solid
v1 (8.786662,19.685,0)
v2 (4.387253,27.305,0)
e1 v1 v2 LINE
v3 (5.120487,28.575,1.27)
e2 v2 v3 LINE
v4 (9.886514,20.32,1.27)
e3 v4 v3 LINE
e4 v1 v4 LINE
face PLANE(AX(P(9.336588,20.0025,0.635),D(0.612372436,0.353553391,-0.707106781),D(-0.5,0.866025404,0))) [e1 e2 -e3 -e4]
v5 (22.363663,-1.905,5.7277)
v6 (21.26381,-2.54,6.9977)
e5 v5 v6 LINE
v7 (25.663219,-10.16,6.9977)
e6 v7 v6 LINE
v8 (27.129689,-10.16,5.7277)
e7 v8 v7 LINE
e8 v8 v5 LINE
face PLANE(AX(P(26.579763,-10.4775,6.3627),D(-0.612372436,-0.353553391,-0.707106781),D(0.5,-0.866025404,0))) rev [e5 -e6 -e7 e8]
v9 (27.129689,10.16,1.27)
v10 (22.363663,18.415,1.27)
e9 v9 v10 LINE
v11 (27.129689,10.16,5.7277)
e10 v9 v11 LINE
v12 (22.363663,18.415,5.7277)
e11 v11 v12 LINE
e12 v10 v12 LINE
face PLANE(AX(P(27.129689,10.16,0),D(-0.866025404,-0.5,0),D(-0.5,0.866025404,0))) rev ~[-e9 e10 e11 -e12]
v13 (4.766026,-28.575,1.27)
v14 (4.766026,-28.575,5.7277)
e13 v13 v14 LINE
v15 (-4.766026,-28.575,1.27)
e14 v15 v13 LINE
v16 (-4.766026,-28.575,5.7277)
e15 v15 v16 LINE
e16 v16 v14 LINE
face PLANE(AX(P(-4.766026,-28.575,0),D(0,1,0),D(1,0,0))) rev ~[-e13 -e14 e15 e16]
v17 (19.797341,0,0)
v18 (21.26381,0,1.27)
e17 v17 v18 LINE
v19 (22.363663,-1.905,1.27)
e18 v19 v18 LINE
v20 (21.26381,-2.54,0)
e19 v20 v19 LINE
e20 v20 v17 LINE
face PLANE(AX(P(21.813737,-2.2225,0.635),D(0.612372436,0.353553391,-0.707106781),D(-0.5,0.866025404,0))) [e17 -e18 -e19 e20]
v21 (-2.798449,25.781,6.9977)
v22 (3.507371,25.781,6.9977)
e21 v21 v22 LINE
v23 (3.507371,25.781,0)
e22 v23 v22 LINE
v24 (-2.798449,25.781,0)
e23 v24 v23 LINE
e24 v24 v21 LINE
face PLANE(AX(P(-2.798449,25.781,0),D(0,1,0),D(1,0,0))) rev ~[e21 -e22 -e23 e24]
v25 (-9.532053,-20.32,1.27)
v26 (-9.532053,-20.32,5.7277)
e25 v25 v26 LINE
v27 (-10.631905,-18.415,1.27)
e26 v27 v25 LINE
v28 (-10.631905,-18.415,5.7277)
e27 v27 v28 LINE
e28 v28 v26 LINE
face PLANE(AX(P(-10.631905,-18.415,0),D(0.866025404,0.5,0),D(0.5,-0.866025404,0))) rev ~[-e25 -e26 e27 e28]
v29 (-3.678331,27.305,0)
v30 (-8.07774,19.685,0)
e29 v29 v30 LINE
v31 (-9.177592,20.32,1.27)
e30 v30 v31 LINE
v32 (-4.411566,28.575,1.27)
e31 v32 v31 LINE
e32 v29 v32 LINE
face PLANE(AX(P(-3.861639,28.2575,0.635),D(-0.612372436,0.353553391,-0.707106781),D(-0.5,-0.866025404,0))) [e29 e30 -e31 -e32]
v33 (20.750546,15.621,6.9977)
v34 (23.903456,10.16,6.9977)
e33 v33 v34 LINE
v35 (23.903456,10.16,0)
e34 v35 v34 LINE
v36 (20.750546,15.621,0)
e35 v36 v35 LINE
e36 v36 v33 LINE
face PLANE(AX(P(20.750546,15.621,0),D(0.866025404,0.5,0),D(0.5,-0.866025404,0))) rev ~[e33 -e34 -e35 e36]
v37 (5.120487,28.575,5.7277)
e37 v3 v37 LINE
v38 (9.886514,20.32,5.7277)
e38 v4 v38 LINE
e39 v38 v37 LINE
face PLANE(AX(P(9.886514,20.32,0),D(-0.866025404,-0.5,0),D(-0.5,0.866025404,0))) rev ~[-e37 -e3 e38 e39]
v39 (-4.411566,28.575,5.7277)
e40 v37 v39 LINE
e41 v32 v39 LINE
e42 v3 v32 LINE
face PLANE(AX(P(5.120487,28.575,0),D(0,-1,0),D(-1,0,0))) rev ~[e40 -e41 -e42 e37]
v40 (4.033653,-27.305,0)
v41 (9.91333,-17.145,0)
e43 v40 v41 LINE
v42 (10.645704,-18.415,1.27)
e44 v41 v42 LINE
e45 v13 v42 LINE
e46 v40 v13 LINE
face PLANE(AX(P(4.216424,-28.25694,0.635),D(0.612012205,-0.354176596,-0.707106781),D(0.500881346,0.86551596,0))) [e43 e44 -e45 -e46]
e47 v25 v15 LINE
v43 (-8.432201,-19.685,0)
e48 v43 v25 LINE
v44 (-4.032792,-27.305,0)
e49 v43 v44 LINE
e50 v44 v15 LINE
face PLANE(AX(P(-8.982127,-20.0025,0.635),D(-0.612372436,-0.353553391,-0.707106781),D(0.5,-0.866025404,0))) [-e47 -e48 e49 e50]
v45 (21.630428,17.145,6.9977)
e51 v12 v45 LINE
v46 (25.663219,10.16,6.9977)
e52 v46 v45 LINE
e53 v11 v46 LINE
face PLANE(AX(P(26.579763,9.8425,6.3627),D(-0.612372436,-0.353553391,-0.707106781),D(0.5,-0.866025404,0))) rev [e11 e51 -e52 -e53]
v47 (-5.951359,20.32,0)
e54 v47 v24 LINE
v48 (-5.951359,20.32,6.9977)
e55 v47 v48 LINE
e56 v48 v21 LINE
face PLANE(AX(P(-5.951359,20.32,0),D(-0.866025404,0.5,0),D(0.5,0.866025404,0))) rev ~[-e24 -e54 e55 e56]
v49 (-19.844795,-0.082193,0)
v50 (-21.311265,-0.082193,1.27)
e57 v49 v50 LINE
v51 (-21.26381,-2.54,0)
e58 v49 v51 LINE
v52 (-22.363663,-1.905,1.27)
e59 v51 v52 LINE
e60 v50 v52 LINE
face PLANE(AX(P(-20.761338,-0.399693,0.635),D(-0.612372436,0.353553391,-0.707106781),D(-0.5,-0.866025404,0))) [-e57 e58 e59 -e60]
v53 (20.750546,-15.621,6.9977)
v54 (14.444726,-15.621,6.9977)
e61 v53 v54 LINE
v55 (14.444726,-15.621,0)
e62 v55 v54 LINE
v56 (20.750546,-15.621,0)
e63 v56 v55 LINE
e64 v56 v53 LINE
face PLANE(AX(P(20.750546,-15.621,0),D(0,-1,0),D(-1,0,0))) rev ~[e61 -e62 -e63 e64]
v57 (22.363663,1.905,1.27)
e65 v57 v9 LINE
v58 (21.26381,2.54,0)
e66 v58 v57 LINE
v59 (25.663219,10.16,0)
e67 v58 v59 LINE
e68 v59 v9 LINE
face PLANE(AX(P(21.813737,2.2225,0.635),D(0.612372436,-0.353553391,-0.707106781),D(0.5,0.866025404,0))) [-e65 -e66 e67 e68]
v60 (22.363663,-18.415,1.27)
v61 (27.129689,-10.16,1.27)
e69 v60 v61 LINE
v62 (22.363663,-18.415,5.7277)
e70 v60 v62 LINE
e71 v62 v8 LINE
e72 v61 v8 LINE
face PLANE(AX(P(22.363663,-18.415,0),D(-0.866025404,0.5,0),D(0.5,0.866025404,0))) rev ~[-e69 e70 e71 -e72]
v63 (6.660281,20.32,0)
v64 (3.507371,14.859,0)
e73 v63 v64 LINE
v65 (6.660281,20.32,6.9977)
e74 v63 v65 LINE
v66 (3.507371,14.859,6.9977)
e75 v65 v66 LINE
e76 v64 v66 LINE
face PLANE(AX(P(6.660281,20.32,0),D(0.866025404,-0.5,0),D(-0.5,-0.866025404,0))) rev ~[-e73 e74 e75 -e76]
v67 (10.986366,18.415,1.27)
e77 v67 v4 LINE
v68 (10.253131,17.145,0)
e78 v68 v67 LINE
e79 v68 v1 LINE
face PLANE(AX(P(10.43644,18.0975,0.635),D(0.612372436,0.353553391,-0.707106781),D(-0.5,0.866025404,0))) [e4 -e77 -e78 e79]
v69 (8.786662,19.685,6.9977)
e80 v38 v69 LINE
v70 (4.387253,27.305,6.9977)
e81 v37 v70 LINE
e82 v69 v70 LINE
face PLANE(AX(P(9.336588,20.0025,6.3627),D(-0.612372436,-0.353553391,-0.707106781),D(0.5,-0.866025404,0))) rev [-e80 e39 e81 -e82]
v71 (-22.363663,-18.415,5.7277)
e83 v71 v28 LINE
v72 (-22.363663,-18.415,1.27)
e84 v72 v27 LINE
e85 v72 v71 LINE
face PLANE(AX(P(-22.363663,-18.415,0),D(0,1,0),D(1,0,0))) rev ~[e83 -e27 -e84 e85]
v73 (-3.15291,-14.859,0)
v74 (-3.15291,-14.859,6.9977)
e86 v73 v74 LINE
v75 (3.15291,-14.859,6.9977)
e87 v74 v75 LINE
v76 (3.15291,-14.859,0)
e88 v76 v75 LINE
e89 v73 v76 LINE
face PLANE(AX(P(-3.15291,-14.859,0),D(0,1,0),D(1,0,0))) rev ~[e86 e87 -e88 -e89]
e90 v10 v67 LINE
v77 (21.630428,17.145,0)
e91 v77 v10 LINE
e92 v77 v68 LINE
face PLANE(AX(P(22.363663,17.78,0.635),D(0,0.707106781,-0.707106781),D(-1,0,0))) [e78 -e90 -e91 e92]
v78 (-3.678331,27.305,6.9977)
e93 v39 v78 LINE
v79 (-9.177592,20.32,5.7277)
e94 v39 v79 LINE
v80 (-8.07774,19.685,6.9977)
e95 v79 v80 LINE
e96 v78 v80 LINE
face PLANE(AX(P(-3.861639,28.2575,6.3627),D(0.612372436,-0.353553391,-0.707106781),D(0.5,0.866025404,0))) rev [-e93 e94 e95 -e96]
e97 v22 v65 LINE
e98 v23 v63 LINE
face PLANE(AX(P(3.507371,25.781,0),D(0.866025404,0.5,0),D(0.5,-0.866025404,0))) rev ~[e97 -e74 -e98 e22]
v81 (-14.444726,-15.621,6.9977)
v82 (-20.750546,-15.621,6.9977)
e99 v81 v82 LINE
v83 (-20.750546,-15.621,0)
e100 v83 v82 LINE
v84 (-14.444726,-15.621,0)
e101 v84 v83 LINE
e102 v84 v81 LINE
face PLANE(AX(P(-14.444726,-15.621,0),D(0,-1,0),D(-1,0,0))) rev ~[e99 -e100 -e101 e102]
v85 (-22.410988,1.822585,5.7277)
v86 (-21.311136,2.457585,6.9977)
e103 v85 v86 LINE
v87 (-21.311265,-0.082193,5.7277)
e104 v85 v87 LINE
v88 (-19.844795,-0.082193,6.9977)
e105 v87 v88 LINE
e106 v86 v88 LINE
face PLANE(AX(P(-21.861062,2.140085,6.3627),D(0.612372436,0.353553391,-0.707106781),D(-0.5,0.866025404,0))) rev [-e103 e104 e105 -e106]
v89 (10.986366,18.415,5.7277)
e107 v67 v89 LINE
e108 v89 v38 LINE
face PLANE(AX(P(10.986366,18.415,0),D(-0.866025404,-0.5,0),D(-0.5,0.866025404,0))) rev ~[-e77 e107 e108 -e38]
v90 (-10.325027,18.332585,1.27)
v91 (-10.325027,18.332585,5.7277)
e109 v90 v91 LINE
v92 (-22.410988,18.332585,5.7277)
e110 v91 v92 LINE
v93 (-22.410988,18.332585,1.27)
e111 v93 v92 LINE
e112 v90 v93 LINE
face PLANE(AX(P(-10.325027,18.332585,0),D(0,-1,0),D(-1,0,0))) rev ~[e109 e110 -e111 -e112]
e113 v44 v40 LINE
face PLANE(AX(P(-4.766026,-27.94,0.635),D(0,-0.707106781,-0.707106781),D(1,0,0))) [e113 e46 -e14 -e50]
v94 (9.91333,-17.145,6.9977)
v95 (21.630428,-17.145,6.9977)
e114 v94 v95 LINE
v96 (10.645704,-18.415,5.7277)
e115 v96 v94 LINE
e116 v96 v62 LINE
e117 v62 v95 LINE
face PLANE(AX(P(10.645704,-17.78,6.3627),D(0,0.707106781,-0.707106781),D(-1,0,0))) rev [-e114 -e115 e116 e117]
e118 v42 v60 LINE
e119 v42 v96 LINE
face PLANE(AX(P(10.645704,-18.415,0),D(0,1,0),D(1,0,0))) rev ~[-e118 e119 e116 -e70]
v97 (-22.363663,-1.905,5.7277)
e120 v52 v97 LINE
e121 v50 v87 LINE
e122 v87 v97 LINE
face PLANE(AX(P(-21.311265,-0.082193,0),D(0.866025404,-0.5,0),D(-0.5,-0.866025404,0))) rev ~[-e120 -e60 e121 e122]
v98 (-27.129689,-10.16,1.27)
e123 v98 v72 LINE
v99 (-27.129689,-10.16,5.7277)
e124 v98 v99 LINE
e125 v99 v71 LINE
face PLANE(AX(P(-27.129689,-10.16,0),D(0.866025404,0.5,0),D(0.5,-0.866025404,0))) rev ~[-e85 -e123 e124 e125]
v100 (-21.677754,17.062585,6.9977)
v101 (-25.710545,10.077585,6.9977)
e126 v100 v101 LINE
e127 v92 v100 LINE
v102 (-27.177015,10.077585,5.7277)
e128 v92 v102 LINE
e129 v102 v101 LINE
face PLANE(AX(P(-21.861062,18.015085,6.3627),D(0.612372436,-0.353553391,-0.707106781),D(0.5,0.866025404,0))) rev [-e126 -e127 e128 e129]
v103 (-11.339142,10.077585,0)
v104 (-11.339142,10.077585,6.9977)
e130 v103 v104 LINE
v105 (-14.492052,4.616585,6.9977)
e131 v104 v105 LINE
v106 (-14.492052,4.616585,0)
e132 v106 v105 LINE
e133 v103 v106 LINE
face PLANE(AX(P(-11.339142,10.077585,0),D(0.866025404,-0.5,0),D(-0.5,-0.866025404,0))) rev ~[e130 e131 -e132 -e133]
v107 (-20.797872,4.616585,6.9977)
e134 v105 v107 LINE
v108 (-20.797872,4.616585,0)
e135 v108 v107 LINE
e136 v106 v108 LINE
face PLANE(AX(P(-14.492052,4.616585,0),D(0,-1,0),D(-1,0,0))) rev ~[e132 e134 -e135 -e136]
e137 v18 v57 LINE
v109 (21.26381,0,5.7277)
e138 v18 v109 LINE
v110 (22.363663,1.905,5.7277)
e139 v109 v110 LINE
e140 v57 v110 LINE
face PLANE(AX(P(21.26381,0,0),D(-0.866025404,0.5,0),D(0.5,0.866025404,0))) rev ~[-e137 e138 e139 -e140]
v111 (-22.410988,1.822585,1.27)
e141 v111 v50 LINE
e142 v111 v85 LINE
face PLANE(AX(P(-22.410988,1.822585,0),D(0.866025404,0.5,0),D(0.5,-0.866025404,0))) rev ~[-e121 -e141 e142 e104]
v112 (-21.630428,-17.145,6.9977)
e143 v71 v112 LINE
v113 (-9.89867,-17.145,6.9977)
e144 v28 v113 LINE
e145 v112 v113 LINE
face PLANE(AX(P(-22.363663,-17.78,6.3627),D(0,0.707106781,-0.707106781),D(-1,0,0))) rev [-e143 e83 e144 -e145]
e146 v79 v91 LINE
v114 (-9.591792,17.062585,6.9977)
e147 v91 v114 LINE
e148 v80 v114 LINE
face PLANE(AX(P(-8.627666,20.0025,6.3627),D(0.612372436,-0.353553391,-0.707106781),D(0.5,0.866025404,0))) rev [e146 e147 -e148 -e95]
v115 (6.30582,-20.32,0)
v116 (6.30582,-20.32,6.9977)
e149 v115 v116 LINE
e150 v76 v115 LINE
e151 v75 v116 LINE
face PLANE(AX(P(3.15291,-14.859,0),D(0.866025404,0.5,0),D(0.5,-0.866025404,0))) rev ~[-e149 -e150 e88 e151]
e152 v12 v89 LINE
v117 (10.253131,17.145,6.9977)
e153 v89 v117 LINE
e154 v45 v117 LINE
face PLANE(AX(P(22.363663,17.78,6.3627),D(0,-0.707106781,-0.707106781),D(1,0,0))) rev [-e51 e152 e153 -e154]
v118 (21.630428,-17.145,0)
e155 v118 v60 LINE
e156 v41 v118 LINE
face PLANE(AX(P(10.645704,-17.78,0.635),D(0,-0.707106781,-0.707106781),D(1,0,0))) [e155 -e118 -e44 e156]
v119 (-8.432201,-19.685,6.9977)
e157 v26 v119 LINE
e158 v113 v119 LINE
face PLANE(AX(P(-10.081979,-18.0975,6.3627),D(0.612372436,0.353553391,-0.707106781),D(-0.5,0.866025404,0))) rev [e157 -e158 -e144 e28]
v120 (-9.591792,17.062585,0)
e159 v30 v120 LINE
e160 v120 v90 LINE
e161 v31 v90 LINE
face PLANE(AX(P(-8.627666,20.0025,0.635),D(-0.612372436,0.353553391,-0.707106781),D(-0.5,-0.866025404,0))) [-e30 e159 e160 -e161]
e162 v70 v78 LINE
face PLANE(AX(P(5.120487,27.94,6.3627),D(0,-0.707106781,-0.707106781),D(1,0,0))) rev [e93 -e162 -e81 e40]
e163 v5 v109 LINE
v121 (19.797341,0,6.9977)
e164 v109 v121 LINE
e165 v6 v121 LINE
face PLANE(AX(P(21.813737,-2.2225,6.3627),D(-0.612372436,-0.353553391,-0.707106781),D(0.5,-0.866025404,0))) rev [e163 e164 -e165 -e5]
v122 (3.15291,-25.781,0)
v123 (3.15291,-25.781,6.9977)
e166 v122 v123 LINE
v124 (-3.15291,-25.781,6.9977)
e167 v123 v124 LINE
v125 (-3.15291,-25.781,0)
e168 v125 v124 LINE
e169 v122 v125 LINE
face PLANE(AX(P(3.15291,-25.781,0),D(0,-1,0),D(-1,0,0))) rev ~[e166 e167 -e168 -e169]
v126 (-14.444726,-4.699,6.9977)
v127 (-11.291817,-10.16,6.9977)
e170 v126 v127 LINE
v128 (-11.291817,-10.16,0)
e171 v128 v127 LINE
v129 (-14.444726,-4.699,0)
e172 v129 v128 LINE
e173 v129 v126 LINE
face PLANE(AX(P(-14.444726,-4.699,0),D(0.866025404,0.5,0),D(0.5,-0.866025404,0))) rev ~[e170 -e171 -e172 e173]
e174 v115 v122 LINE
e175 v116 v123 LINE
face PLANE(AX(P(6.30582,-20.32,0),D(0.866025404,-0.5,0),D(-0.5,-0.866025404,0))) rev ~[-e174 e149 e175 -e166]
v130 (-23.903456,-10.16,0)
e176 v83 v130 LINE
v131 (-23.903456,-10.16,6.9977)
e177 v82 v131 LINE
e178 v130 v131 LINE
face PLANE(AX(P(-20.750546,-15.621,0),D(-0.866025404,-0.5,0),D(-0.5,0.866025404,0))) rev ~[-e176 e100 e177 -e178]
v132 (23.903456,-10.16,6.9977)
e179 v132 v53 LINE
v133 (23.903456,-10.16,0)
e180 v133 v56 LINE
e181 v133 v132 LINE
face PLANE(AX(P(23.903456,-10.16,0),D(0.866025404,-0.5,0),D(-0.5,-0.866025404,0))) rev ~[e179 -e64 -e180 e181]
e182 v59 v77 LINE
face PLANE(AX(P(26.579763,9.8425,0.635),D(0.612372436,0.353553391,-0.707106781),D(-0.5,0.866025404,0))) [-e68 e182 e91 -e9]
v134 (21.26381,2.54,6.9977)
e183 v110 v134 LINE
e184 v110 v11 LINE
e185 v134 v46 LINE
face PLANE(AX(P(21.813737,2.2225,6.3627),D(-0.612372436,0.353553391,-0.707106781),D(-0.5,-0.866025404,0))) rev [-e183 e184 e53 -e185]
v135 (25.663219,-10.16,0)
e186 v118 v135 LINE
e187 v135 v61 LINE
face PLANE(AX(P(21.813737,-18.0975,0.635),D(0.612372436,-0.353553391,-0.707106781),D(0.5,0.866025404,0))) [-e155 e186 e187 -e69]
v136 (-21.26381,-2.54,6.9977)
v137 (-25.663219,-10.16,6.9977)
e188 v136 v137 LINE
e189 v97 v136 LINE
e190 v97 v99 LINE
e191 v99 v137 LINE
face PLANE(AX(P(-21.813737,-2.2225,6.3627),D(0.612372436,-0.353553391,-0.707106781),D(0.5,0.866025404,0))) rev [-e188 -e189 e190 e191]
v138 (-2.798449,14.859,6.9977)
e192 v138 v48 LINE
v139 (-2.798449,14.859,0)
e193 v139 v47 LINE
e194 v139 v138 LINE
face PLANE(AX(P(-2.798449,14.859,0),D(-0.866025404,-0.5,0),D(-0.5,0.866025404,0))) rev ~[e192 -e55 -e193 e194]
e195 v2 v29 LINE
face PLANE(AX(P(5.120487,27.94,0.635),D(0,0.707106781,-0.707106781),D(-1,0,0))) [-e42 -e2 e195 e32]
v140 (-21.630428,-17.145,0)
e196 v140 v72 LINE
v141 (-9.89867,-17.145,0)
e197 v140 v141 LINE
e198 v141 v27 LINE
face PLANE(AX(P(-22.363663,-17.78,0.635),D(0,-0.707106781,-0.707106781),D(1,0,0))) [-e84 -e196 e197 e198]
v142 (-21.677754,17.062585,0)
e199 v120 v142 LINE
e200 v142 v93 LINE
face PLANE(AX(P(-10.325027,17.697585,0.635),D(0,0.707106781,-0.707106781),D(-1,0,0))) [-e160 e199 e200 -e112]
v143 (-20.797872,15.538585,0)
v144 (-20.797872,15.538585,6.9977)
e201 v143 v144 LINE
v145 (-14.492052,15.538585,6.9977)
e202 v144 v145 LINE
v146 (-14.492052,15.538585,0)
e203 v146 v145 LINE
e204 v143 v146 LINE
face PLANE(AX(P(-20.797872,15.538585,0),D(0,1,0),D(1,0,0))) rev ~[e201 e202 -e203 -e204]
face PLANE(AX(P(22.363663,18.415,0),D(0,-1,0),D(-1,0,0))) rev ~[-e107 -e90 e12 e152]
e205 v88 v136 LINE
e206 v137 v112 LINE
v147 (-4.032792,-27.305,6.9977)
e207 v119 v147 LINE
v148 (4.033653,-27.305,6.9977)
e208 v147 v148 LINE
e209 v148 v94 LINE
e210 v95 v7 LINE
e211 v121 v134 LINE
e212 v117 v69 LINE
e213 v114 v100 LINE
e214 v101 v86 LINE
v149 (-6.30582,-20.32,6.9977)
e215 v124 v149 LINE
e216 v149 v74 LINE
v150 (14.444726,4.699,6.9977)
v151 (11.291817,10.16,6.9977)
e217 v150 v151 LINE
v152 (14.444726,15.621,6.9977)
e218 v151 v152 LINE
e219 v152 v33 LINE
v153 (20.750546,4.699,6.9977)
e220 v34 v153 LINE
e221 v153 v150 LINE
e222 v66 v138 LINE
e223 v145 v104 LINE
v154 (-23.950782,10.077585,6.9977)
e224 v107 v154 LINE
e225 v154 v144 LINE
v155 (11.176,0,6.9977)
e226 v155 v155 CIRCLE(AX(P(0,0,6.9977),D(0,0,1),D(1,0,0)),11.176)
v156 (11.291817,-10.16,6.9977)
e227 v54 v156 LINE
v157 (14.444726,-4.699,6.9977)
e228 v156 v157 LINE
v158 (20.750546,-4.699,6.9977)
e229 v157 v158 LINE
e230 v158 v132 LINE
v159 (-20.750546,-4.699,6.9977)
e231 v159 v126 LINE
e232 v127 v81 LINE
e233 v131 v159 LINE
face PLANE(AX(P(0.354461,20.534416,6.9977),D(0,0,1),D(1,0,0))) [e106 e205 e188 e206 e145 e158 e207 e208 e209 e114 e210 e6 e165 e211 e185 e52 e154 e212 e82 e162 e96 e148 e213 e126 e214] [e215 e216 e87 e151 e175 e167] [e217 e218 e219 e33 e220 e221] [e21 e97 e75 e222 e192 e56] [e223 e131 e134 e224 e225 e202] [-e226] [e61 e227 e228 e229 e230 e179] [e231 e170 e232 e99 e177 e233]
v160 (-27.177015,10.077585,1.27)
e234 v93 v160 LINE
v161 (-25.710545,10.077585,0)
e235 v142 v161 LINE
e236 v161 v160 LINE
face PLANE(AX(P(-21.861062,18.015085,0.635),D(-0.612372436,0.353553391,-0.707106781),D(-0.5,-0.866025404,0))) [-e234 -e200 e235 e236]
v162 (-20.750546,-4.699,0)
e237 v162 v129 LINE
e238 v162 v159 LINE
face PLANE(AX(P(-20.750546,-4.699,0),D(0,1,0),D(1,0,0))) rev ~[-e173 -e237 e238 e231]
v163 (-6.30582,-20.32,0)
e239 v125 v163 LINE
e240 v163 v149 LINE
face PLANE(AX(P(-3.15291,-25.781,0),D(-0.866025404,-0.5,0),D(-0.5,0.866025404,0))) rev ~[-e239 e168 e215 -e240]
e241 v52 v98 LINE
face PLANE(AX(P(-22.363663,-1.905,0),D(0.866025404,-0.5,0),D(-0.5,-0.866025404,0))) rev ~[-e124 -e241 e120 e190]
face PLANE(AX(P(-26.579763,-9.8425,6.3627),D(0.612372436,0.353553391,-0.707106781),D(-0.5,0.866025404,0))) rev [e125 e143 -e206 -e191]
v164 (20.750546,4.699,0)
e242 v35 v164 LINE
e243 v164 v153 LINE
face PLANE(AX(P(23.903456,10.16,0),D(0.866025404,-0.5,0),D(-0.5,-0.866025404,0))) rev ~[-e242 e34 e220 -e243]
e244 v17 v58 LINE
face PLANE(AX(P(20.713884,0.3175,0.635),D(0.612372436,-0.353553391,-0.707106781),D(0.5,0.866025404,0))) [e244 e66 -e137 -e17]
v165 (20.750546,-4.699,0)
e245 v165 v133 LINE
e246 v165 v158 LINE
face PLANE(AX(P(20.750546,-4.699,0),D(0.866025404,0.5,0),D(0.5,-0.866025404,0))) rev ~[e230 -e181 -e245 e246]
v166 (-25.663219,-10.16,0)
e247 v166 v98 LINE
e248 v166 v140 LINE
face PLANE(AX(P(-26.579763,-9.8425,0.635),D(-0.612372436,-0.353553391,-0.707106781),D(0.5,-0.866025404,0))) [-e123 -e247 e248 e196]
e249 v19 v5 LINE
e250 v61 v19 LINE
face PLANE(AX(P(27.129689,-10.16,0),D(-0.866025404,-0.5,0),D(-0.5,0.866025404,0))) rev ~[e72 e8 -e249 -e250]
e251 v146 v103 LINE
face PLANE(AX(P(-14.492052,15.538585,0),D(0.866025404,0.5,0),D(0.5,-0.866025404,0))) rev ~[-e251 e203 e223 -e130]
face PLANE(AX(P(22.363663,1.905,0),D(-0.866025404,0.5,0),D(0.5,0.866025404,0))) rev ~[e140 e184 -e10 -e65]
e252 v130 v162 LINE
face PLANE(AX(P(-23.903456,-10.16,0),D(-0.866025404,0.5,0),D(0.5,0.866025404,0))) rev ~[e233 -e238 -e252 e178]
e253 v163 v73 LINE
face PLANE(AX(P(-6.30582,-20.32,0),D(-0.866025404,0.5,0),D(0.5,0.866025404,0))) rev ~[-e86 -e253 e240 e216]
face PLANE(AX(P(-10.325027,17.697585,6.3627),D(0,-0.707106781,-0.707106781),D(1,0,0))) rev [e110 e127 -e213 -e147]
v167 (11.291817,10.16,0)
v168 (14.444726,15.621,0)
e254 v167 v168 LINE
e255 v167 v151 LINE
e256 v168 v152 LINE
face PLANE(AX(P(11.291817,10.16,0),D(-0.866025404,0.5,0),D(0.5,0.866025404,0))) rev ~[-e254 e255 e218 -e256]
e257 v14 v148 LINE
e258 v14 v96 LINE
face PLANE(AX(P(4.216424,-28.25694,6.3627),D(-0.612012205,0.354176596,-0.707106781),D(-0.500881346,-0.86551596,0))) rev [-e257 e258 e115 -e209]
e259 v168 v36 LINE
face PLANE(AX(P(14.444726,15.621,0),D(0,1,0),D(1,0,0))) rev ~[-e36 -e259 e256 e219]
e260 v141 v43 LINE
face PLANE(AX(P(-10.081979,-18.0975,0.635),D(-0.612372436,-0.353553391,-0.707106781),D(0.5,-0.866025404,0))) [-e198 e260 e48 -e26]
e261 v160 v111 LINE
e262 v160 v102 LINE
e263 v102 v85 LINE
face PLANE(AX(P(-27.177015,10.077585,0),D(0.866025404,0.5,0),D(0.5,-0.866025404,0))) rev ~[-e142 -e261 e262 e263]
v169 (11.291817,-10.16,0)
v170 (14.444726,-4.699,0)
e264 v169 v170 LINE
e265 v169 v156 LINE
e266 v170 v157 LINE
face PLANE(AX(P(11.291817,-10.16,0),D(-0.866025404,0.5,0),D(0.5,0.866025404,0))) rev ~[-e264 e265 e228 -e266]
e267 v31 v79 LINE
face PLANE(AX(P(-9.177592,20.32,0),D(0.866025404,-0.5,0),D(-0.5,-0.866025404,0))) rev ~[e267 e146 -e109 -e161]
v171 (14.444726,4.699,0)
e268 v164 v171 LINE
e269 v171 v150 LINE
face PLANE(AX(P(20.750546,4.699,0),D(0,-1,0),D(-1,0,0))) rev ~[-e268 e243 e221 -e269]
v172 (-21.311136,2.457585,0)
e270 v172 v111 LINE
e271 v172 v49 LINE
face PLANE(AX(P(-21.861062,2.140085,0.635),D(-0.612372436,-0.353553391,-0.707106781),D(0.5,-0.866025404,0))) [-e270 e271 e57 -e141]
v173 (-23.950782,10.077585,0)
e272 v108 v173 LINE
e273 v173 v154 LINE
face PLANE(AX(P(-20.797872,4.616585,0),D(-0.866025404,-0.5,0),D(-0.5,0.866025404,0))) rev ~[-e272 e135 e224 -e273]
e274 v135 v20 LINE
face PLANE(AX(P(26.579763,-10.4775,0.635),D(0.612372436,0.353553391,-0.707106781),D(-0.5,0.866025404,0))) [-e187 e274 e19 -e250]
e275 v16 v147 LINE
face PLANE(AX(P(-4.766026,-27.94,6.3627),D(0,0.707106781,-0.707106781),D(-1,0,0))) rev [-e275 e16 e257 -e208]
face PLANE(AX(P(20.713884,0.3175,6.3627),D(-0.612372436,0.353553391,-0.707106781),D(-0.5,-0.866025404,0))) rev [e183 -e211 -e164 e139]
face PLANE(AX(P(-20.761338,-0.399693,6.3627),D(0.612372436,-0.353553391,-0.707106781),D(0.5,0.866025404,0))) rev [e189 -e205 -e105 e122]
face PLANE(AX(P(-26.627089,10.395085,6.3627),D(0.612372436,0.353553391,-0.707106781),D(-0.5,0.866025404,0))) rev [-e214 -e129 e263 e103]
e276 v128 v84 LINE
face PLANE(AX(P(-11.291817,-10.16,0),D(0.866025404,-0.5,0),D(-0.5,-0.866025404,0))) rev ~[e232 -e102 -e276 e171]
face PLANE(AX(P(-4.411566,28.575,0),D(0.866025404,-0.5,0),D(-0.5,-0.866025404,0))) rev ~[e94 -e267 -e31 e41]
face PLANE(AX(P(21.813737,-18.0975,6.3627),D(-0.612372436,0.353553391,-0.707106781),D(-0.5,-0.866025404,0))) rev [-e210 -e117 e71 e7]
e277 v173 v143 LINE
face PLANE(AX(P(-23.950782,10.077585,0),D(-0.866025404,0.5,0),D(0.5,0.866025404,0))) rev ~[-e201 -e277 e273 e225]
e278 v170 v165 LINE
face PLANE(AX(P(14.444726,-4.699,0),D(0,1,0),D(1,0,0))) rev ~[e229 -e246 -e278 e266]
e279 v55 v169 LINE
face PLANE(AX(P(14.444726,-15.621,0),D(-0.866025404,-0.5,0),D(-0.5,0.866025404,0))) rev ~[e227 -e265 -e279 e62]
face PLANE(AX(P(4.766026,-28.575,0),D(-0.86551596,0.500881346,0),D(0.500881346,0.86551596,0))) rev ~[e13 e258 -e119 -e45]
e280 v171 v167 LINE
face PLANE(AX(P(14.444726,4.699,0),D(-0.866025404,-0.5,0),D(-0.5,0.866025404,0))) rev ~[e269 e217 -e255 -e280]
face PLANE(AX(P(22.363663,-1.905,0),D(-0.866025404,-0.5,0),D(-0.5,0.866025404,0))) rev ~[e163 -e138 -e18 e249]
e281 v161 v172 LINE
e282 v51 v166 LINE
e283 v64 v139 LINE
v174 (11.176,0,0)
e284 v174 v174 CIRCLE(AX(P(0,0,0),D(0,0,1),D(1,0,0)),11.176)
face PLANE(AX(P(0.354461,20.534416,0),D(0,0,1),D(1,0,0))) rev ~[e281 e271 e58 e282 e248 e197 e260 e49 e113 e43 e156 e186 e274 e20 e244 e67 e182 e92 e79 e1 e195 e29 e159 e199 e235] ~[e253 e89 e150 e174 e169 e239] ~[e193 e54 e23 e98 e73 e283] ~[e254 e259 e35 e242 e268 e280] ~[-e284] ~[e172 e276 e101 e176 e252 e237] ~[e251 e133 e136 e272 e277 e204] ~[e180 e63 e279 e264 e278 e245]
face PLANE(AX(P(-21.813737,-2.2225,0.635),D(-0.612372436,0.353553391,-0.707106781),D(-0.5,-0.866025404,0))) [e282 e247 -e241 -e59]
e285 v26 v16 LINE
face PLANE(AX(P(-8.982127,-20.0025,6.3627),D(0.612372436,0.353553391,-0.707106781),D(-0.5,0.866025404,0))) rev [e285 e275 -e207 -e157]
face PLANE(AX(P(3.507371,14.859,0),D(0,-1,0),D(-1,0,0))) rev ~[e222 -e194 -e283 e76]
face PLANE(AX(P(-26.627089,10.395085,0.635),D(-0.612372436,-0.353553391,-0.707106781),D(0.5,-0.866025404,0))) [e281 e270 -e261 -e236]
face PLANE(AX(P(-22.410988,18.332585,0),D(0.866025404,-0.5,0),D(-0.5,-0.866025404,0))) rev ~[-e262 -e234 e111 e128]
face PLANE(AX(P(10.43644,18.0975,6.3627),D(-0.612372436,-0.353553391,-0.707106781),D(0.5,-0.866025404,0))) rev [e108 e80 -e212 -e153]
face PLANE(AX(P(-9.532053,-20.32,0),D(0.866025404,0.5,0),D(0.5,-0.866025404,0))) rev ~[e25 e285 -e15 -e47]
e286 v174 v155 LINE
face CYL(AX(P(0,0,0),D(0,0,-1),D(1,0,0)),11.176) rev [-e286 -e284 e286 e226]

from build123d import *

# Parameters (mm, degrees)
F1_DEPTH = 6.9977
F2_R     = 11.176
F3_DEPTH = 6.9977
F4_SIZE  = 1.27


# Not quite as in the source:
# - a feature names something its author has since deleted; it is built from what else it names


with BuildPart() as f1:
    # F0 (on Top) → F1 (new body)
    with BuildSketch(Plane.XY):
        Polygon((-1.27, 12.7), (1.27, 12.7), (5.4871048633, 12.7), (6.9125849394, 15.169003917), (7.0907659214, 15.4776224307), (9.8865139145, 20.32), (5.1204874424, 28.575), (-4.411565502, 28.575), (-9.1775919741, 20.32), (-4.7781829229, 12.7), align=None)
        Polygon((6.6602806103, 20.32), (3.5073707902, 14.859), (-2.7984488498, 14.859), (-5.9513586699, 20.32), (-2.7984488498, 25.781), (3.5073707902, 25.781), align=None, mode=Mode.SUBTRACT)
        Polygon((6.9125849394, 15.169003917), (5.4871048633, 12.7), (7.3323484187, 12.7), (8.4322006815, 10.795), (12.8316097327, 18.415), (10.9863661773, 18.415), (9.8865139145, 20.32), (7.0907659214, 15.4776224307), align=None)
        Polygon((-7.3323484187, 12.7), (-4.7781829229, 12.7), (-9.1775919741, 20.32), (-10.3250266623, 18.3325848218), (-12.8789355329, 18.3325848218), (-8.4796547943, 10.7128070657), align=None)
        Polygon((12.8316097327, 18.415), (8.4322006815, 10.795), (11.6335226281, 5.2501477372), (13.5648445746, 1.905), (16.3276362049, 1.905), (18.8676362049, 1.905), (22.3636626771, 1.905), (27.1296891492, 10.16), (22.3636626771, 18.415), align=None)
        Polygon((20.7505460249, 4.699), (14.4447263849, 4.699), (11.2918165648, 10.16), (14.4447263849, 15.621), (20.7505460249, 15.621), (23.903455845, 10.16), align=None, mode=Mode.SUBTRACT)
        Polygon((-9.8614826635, 8.3194109889), (-8.4796547943, 10.7128070657), (-12.8789355329, 18.3325848218), (-22.4109884772, 18.3325848218), (-27.1770149494, 10.0775848218), (-22.4109884772, 1.8225848218), (-13.612427, 1.8225848218), (-11.1783483187, 6.0385327673), align=None)
        Polygon((-14.492052185, 15.5385848218), (-11.339142365, 10.0775848218), (-14.492052185, 4.6165848218), (-20.7978718251, 4.6165848218), (-23.9507816452, 10.0775848218), (-20.7978718251, 15.5385848218), align=None, mode=Mode.SUBTRACT)
        Polygon((16.3276362049, 1.905), (13.5648445746, 1.905), (14.6646968374, 0), (13.5648445746, -1.905), (22.3636626771, -1.905), (21.2638104143, 0), (22.3636626771, 1.905), (18.8676362049, 1.905), align=None)
        Polygon((-14.6646968374, 0), (-13.612427, 1.8225848218), (-22.4109884772, 1.8225848218), (-21.311264527, -0.0821929343), (-22.3636626771, -1.905), (-19.9342235854, -1.905), (-17.3764717744, -1.905), (-13.5648445746, -1.905), align=None)
        Polygon((22.3636626771, -1.905), (13.5648445746, -1.905), (10.3635226281, -7.4498522628), (8.4322006815, -10.795), (9.8135964967, -13.1876477372), (11.0835964967, -15.3873522628), (12.8316097327, -18.415), (22.3636626771, -18.415), (27.1296891492, -10.16), align=None)
        Polygon((14.4447263849, -15.621), (11.2918165648, -10.16), (14.4447263849, -4.699), (20.7505460249, -4.699), (23.903455845, -10.16), (20.7505460249, -15.621), align=None, mode=Mode.SUBTRACT)
        Polygon((-11.6335226281, -5.2501477372), (-13.5648445746, -1.905), (-17.3764717744, -1.905), (-19.9342235854, -1.905), (-22.3636626771, -1.905), (-27.1296891492, -10.16), (-22.3636626771, -18.415), (-12.8316097327, -18.415), (-8.4322006815, -10.795), (-10.3635226281, -7.4498522628), align=None)
        Polygon((-20.7505460249, -4.699), (-14.4447263849, -4.699), (-11.2918165648, -10.16), (-14.4447263849, -15.621), (-20.7505460249, -15.621), (-23.903455845, -10.16), align=None, mode=Mode.SUBTRACT)
        Polygon((9.8135964967, -13.1876477372), (8.4322006815, -10.795), (7.3323484187, -12.7), (5.1326438931, -12.7), (9.5320529443, -20.32), (4.7660264722, -28.575), (10.6457036946, -18.415), (12.8316097327, -18.415), (11.0835964967, -15.3873522628), align=None)
        Polygon((9.5320529443, -20.32), (5.1326438931, -12.7), (1.27, -12.7), (-1.27, -12.7), (-5.1326438931, -12.7), (-6.5140397082, -15.0926477372), (-7.7840397082, -17.2923522628), (-9.5320529443, -20.32), (-4.7660264722, -28.575), (4.7660264722, -28.575), align=None)
        Polygon((-6.3058196401, -20.32), (-3.15290982, -14.859), (3.15290982, -14.859), (6.3058196401, -20.32), (3.15290982, -25.781), (-3.15290982, -25.781), align=None, mode=Mode.SUBTRACT)
        Polygon((-7.3323484187, -12.7), (-8.4322006815, -10.795), (-12.8316097327, -18.415), (-10.6319052071, -18.415), (-9.5320529443, -20.32), (-7.7840397082, -17.2923522628), (-6.5140397082, -15.0926477372), (-5.1326438931, -12.7), align=None)
        Polygon((5.4871048633, 12.7), (1.27, 12.7), (-1.27, 12.7), (-4.7781829229, 12.7), (-4.411565502, 12.065), (-2.0086818804, 12.065), (1.267424375, 12.065), (5.1204874424, 12.065), align=None)
        Polygon((-12.8316097327, -1.905), (-13.5648445746, -1.905), (-11.6335226281, -5.2501477372), (-11.0835964967, -4.9326477372), align=None)
        Polygon((1.27, -12.7), (5.1326438931, -12.7), (4.7660264722, -12.065), (1.27, -12.065), (-1.27, -12.065), (-4.7660264722, -12.065), (-5.1326438931, -12.7), (-1.27, -12.7), align=None)
        Polygon((9.8135964967, -7.1323522628), (10.3635226281, -7.4498522628), (11.5783918417, -5.2183179628), (11.0835964967, -4.9326477372), align=None)
        Polygon((11.0835964967, 4.9326477372), (11.6335226281, 5.2501477372), (10.3083918417, 7.4180224884), (9.8135964967, 7.1323522628), align=None)
        Polygon((-9.3113640632, 8.0017998669), (-9.8614826635, 8.3194109889), (-11.1783483187, 6.0385327673), (-10.6282297184, 5.7209216453), align=None)
        Polygon((11.6335226281, 5.2501477372), (8.4322006815, 10.795), (8.0655832606, 10.16), (9.8135964967, 7.1323522628), (10.3083918417, 7.4180224884), align=None)
        Polygon((10.3635226281, -7.4498522628), (13.5648445746, -1.905), (12.8316097327, -1.905), (11.0835964967, -4.9326477372), (11.5783918417, -5.2183179628), align=None)
    extrude(amount=F1_DEPTH)

    # F2 (on Top) → F3 (join)
    with BuildSketch(Plane.XY):
        Polygon((7.6989658396, 13.335), (-7.6989658396, 13.335), (-15.3979316793, 0), (-7.6989658396, -13.335), (7.6989658396, -13.335), (15.3979316793, 0), align=None)
        Circle(F2_R, mode=Mode.SUBTRACT)
    extrude(amount=F3_DEPTH)

    # F4
    f4_edges = [f1.edges().sort_by_distance(p)[0] for p in [
        (-16.497784, -18.415, 6.9977),
        (-16.497784, -18.415, 0),
        (-7.698966, -23.495, 6.9977),
        (-7.698966, -23.495, 0),
        (0, -28.575, 6.9977),
        (0, -28.575, 0),
        (7.705865, -23.495, 0),
        (7.705865, -23.495, 6.9977),
        (16.504683, -18.415, 0),
        (16.504683, -18.415, 6.9977),
        (24.746676, -14.2875, 6.9977),
        (24.746676, -14.2875, 0),
        (24.19675, 5.08, 0),
        (24.19675, 5.08, 6.9977),
        (24.746676, 14.2875, 6.9977),
        (24.746676, 14.2875, 0),
        (16.675014, 18.415, 0),
        (16.675014, 18.415, 6.9977),
        (8.053427, 23.495, 0),
        (8.053427, 23.495, 6.9977),
        (0.354461, 28.575, 0),
        (0.354461, 28.575, 6.9977),
        (-7.368296, 23.453792, 6.9977),
        (-7.368296, 23.453792, 0),
        (-16.368008, 18.332585, 0),
        (-16.368008, 18.332585, 6.9977),
        (-24.794002, 14.205085, 0),
        (-24.794002, 14.205085, 6.9977),
        (-24.24414, 4.997696, 6.9977),
        (-24.24414, 4.997696, 0),
        (-24.220477, -5.121096, 0),
        (-24.220477, -5.121096, 6.9977),
        (-24.746676, -14.2875, 6.9977),
        (-24.746676, -14.2875, 0),
        (24.19675, -5.08, 0),
        (24.19675, -5.08, 6.9977),
    ]]
    chamfer(f4_edges, length=F4_SIZE)


solid = f1.part
